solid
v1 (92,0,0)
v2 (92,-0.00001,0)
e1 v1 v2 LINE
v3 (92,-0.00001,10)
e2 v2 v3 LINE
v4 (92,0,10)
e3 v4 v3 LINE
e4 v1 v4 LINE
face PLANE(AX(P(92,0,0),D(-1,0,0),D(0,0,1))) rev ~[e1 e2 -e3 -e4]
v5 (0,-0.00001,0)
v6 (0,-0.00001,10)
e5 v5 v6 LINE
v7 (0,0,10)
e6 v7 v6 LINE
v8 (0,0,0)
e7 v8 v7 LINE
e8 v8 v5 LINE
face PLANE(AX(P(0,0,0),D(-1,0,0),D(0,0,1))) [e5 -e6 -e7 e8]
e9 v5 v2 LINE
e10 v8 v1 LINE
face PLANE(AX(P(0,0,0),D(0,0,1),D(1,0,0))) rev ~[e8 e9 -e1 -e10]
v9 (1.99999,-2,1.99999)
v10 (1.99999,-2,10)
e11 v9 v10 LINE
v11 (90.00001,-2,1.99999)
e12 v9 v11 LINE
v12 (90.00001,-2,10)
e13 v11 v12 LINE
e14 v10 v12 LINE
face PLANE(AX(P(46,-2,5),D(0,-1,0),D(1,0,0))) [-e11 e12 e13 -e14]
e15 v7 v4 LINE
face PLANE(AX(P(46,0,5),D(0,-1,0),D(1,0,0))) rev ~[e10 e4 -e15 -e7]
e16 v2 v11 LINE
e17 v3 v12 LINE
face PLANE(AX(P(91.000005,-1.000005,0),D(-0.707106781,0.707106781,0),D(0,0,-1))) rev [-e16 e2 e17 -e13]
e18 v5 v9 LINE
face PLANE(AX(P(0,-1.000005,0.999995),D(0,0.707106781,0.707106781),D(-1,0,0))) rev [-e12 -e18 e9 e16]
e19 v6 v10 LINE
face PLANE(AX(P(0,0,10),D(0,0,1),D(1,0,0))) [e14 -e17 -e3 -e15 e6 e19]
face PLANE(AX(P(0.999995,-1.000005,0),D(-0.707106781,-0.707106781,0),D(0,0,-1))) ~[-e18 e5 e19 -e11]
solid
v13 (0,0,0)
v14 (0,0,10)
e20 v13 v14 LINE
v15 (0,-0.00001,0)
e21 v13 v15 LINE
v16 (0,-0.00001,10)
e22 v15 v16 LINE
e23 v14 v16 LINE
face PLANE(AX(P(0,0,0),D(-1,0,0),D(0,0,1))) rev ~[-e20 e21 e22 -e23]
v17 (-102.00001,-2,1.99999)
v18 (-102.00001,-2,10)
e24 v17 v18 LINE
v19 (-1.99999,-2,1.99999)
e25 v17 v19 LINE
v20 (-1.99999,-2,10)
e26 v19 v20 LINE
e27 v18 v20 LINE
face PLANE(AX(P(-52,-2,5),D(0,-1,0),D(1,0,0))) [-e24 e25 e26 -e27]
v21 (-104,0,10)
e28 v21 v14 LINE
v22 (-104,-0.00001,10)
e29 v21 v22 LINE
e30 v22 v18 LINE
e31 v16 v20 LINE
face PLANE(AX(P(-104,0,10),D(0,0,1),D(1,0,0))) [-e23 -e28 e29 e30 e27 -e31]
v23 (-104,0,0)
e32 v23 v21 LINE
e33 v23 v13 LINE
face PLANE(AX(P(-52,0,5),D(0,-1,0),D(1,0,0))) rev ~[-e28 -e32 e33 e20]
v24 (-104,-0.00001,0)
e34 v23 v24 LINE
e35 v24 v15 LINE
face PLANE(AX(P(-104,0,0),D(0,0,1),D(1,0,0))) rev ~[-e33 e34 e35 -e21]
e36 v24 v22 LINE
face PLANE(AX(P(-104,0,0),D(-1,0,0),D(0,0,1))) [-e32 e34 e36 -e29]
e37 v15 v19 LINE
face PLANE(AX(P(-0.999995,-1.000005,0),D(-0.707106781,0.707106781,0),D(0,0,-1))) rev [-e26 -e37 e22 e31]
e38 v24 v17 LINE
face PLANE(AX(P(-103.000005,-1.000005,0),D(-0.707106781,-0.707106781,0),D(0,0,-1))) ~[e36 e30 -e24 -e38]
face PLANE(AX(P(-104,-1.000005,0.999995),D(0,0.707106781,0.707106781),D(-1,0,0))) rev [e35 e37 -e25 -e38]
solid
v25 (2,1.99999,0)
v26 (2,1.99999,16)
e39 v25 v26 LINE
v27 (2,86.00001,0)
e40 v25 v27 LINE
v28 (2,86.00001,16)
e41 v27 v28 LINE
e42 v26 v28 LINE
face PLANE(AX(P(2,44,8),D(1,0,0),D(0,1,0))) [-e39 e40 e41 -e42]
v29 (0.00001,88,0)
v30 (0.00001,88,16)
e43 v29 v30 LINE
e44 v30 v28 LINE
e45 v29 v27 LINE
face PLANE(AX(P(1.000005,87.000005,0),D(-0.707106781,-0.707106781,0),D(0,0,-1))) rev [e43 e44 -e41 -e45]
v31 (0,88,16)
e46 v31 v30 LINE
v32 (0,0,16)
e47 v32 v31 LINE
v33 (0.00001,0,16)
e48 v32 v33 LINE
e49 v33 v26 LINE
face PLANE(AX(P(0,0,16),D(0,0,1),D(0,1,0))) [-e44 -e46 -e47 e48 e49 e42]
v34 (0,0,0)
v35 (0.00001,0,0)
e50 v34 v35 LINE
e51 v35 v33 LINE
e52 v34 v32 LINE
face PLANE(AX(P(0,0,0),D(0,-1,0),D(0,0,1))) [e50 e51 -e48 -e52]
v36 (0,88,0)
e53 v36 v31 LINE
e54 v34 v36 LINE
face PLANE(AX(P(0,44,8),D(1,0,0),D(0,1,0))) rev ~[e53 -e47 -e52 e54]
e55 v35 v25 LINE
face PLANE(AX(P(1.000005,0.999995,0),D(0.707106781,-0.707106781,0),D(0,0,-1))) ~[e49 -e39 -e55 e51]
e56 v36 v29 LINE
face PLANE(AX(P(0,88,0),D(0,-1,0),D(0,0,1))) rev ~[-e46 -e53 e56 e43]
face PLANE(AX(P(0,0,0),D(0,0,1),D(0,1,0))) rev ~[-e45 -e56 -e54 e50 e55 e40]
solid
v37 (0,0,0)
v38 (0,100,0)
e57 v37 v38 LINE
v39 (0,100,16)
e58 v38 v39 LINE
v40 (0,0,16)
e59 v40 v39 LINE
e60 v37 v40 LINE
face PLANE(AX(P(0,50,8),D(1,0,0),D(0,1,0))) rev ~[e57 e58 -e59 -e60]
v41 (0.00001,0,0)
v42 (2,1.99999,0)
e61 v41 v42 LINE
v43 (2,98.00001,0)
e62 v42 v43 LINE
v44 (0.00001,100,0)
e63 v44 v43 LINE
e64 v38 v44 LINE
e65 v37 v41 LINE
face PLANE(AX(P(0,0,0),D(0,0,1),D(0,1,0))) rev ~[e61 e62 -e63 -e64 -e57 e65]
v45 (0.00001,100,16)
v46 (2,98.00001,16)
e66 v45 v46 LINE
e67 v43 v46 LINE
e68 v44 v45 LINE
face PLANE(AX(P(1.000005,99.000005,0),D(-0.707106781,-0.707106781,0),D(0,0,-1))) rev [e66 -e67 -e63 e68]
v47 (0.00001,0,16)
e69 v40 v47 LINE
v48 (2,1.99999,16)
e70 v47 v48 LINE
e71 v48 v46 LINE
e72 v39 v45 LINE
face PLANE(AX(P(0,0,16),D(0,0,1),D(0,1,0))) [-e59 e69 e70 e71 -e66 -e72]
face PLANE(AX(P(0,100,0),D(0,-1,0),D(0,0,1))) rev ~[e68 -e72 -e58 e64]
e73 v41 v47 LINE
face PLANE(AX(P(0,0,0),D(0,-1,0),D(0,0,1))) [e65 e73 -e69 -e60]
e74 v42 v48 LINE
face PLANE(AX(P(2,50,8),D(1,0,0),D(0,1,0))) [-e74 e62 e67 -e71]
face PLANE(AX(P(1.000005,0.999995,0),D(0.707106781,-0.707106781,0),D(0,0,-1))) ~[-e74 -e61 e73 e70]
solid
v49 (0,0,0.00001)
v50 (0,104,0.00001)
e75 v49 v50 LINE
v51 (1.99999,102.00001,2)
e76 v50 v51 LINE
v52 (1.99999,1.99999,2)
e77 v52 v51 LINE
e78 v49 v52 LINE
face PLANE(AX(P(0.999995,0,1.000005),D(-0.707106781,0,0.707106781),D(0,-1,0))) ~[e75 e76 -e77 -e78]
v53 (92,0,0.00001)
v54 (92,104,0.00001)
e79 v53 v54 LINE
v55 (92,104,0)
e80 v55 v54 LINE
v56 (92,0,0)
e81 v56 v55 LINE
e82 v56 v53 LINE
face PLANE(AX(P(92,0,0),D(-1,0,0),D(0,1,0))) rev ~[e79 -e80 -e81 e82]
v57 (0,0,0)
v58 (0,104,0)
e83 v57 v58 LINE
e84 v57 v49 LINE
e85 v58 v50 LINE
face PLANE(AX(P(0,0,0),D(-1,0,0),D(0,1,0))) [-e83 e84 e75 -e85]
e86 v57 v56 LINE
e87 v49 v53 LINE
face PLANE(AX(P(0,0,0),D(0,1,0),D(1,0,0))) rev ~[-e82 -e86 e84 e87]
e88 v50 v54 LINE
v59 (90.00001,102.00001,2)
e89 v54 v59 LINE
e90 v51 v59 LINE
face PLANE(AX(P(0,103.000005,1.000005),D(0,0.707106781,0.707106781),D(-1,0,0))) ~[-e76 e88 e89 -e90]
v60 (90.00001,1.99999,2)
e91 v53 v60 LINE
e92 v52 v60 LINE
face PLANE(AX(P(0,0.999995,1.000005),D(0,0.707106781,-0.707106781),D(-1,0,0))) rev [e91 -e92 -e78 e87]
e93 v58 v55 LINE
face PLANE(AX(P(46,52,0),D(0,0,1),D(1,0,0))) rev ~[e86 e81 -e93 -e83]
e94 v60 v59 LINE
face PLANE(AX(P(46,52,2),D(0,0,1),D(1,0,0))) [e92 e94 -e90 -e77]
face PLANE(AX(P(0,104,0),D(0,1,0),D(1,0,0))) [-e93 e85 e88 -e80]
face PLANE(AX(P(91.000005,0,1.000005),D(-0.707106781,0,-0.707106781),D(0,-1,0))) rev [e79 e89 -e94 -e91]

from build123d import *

# Parameters (mm, degrees)
F0_W      = 92
F0_H      = 104
F1_DEPTH  = 2
F2_SIZE   = 1.99999
F3_W      = 104
F3_H      = 10
F4_DEPTH  = 2
F5_SIZE   = 1.99999
F6_W      = 92
F6_H      = 10
F7_DEPTH  = 2
F8_SIZE   = 1.99999
F9_W      = 100
F9_H      = 16
F10_DEPTH = 2
F11_SIZE  = 1.99999
F12_W     = 88
F12_H     = 16
F13_DEPTH = 2
F14_SIZE  = 1.99999


# Not quite as in the source:
# - a fillet or chamfer is up to 0.001 mm smaller than in the source, because OpenCascade refuses the exact size


with BuildPart() as f1:
    # F0 (on Top) → F1 (new body)
    with BuildSketch(Plane.XY):
        with Locations((46, 52)):
            Rectangle(F0_W, F0_H)
    extrude(amount=F1_DEPTH)

    # F2 (size 2 in the source; OpenCascade refuses exactly that, so slightly less here)
    f2_edges = [f1.edges().sort_by_distance(p)[0] for p in [
        (0, 52, 2),
        (46, 0, 2),
        (92, 52, 2),
        (46, 104, 2),
    ]]
    chamfer(f2_edges, length=F2_SIZE)


with BuildPart() as f4:
    # F3 (on Front) → F4 (new body)
    with BuildSketch(Plane.XZ):
        with Locations((-52, 5)):
            Rectangle(F3_W, F3_H)
    extrude(amount=F4_DEPTH)

    # F5 (size 2 in the source; OpenCascade refuses exactly that, so slightly less here)
    f5_edges = [f4.edges().sort_by_distance(p)[0] for p in [
        (-52, -2, 0),
        (0, -2, 5),
        (-104, -2, 5),
    ]]
    chamfer(f5_edges, length=F5_SIZE)


with BuildPart() as f7:
    # F6 (on Front) → F7 (new body)
    with BuildSketch(Plane.XZ):
        with Locations((46, 5)):
            Rectangle(F6_W, F6_H)
    extrude(amount=F7_DEPTH)

    # F8 (size 2 in the source; OpenCascade refuses exactly that, so slightly less here)
    f8_edges = [f7.edges().sort_by_distance(p)[0] for p in [
        (0, -2, 5),
        (46, -2, 0),
        (92, -2, 5),
    ]]
    chamfer(f8_edges, length=F8_SIZE)


with BuildPart() as f10:
    # F9 (on Right) → F10 (new body)
    with BuildSketch(Plane.YZ):
        with Locations((50, 8)):
            Rectangle(F9_W, F9_H)
    extrude(amount=F10_DEPTH)

    # F11 (size 2 in the source; OpenCascade refuses exactly that, so slightly less here)
    f11_edges = [f10.edges().sort_by_distance(p)[0] for p in [
        (2, 100, 8),
        (2, 0, 8),
    ]]
    chamfer(f11_edges, length=F11_SIZE)


with BuildPart() as f13:
    # F12 (on Right) → F13 (new body)
    with BuildSketch(Plane.YZ):
        with Locations((44, 8)):
            Rectangle(F12_W, F12_H)
    extrude(amount=F13_DEPTH)

    # F14 (size 2 in the source; OpenCascade refuses exactly that, so slightly less here)
    f14_edges = [f13.edges().sort_by_distance(p)[0] for p in [
        (2, 0, 8),
        (2, 88, 8),
    ]]
    chamfer(f14_edges, length=F14_SIZE)


solid = Compound([f1.part, f4.part, f7.part, f10.part, f13.part])
